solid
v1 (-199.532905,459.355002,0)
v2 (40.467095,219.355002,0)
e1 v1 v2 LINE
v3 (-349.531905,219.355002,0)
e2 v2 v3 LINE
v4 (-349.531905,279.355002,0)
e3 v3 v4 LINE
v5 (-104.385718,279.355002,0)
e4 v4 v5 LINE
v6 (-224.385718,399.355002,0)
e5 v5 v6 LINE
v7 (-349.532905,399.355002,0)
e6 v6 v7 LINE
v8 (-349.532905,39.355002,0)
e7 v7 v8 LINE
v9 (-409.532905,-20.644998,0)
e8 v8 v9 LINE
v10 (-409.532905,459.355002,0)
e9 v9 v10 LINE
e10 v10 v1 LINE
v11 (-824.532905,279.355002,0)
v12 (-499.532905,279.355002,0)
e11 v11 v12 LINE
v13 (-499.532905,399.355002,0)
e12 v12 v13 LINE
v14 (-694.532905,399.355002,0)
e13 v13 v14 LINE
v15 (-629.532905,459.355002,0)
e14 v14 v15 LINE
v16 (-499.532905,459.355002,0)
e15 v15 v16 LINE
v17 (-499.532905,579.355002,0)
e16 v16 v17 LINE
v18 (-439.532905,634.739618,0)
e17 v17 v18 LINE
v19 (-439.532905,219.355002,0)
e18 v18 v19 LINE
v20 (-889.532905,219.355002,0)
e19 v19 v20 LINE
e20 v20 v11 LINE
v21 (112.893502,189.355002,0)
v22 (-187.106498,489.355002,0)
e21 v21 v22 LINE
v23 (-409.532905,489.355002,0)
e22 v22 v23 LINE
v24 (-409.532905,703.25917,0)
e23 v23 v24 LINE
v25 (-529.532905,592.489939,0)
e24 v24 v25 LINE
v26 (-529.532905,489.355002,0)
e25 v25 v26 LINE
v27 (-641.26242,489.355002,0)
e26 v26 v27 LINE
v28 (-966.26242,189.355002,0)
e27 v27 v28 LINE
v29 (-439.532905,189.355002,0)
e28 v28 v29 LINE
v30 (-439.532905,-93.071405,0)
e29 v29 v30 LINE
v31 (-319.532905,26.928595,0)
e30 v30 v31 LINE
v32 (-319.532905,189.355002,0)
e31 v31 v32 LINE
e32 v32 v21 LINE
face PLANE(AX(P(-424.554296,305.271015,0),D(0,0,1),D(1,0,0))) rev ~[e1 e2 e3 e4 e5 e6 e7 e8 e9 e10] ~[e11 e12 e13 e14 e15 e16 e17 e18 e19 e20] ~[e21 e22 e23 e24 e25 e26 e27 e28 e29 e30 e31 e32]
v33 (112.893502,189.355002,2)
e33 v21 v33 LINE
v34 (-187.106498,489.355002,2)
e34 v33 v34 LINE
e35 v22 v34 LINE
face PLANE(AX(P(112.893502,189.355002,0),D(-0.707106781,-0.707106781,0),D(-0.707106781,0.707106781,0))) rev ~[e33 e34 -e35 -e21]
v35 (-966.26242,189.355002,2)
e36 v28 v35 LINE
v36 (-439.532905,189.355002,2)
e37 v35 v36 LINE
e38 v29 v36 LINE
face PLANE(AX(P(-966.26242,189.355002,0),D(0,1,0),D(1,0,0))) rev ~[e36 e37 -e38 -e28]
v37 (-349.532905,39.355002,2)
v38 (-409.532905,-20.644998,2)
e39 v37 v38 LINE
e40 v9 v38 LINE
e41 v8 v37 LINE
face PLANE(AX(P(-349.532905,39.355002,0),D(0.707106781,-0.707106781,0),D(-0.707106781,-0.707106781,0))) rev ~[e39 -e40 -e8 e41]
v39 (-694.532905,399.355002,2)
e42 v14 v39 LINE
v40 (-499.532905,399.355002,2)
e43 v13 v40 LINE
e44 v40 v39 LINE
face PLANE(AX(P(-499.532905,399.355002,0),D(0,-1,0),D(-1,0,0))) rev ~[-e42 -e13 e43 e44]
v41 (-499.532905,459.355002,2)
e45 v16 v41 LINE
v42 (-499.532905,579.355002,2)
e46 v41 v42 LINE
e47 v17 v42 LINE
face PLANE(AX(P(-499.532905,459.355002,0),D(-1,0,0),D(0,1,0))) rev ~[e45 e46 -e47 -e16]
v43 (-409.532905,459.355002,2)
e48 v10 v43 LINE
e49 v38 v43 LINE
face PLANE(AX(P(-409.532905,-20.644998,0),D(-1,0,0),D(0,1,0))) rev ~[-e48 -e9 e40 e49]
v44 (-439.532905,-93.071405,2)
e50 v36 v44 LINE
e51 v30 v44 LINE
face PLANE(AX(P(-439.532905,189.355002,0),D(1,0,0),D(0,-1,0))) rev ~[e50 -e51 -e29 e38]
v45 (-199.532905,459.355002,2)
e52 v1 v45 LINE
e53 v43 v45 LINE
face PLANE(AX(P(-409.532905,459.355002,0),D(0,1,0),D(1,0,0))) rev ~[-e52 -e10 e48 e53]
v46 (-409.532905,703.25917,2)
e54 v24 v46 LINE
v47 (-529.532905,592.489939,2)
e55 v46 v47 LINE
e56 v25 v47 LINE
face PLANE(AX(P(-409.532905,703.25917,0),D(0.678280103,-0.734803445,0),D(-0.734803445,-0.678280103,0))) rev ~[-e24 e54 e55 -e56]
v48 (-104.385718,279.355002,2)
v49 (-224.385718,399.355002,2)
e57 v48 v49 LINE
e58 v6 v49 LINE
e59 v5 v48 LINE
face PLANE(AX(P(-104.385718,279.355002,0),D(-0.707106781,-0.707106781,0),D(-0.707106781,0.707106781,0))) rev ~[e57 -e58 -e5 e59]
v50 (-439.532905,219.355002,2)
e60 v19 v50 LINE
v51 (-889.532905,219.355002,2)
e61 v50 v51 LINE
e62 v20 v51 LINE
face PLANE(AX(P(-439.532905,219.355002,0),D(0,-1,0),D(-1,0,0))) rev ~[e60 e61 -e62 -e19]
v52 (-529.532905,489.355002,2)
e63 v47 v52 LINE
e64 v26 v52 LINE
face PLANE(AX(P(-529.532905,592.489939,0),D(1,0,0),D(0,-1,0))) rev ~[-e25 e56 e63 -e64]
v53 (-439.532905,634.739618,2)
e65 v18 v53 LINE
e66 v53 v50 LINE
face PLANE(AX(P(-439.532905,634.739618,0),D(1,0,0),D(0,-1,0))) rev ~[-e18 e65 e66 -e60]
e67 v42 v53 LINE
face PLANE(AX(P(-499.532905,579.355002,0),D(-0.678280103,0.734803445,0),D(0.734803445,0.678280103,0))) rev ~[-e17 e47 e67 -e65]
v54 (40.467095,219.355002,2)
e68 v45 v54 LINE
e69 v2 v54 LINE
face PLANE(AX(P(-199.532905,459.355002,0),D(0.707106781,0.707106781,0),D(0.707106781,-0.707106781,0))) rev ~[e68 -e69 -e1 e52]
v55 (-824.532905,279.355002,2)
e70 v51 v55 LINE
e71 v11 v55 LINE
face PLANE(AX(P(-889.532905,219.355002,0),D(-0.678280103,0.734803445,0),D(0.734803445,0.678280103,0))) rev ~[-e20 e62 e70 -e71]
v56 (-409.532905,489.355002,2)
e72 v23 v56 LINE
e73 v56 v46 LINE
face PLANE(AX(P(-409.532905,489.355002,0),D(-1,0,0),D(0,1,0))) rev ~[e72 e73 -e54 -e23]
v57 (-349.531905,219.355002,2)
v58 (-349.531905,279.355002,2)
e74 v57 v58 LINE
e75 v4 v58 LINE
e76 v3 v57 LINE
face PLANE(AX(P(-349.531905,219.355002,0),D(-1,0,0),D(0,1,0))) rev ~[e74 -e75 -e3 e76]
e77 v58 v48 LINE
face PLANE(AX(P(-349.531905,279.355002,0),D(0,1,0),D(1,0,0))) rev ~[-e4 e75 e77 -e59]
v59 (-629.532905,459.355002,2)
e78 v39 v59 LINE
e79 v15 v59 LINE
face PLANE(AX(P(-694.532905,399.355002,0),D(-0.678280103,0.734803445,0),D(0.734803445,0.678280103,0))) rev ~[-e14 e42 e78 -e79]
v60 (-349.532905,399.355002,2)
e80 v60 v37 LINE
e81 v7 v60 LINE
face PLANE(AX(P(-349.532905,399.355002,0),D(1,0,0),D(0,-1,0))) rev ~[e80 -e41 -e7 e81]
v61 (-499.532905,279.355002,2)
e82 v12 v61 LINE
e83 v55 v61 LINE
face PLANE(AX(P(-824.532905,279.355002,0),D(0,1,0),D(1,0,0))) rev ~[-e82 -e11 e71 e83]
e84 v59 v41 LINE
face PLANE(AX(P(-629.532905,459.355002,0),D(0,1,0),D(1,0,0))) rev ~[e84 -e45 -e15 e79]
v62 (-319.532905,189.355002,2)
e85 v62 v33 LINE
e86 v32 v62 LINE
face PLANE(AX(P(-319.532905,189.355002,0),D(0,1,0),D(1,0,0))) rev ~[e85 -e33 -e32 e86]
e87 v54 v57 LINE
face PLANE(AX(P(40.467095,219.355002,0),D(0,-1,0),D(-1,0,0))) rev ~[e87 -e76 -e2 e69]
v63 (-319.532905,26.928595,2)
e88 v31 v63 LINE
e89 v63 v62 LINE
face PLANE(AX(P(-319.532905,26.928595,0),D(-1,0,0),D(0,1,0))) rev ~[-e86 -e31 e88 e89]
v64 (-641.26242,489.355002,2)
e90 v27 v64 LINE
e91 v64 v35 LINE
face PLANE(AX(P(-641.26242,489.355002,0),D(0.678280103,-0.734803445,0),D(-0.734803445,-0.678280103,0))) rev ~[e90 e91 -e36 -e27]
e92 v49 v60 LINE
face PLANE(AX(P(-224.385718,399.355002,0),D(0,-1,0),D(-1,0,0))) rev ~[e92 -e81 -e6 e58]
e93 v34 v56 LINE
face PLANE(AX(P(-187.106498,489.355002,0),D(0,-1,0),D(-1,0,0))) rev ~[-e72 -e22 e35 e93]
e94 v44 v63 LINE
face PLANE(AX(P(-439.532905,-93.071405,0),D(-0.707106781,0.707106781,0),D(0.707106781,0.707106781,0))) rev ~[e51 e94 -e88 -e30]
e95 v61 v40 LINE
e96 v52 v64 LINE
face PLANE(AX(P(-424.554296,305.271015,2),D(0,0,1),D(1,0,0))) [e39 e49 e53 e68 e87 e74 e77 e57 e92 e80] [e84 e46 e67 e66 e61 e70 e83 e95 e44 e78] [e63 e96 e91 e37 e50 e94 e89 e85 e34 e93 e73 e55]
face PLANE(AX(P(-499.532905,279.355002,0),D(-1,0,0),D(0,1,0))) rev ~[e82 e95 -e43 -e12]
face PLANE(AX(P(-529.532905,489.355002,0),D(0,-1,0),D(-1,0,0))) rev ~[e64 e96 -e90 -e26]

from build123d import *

# Parameters (mm, degrees)
F0_W     = 0.001
F0_H     = 60
F1_DEPTH = 2


with BuildPart() as f1:
    # F0 (on Top) → F1 (new body)
    with BuildSketch(Plane.XY):
        Polygon((-409.5329046249, 489.3550023332), (-409.5329046249, 703.2591700554), (-439.5329046249, 675.5668623631), (-439.5329046249, 634.7396177178), (-439.5329046249, 219.3550023332), (-439.5329046249, 189.3550023332), (-439.5329046249, -93.071404538), (-409.5329046249, -63.071404538), (-409.5329046249, -20.6449976668), (-409.5329046249, 189.3550023332), (-409.5329046249, 279.3550023332), (-409.5329046249, 399.3550023332), (-409.5329046249, 459.3550023332), align=None)
        Polygon((-187.1064977537, 489.3550023332), (-409.5329046249, 489.3550023332), (-409.5329046249, 459.3550023332), (-199.5329046249, 459.3550023332), (-157.1064977537, 459.3550023332), align=None)
        Polygon((-439.5329046249, 634.7396177178), (-439.5329046249, 675.5668623631), (-499.5329046249, 620.1822469785), (-499.5329046249, 579.3550023332), align=None)
        Polygon((-499.5329046249, 579.3550023332), (-499.5329046249, 620.1822469785), (-529.5329046249, 592.4899392862), (-529.5329046249, 551.6626946409), align=None)
        Polygon((-157.1064977537, 459.3550023332), (-199.5329046249, 459.3550023332), (-139.5329046249, 399.3550023332), (40.4670953751, 219.3550023332), (-44.3857183673, 219.3550023332), (-349.5319046249, 219.3550023332), (-349.5329046249, 219.3550023332), (-349.5329046249, 189.3550023332), (-319.5329046249, 189.3550023332), (112.8935022463, 189.3550023332), align=None)
        Polygon((-439.5329046249, 189.3550023332), (-439.5329046249, 219.3550023332), (-889.5329046249, 219.3550023332), (-922.0329046249, 189.3550023332), align=None)
        Polygon((-499.5329046249, 459.3550023332), (-499.5329046249, 579.3550023332), (-529.5329046249, 551.6626946409), (-529.5329046249, 489.3550023332), (-597.0329046249, 489.3550023332), (-629.5329046249, 459.3550023332), align=None)
        Polygon((-224.3857183673, 399.3550023332), (-349.5329046249, 399.3550023332), (-349.5329046249, 279.3550023332), (-349.5319046249, 279.3550023332), (-104.3857183673, 279.3550023332), align=None)
        Polygon((-922.0329046249, 189.3550023332), (-889.5329046249, 219.3550023332), (-933.7624196573, 219.3550023332), (-966.2624196573, 189.3550023332), align=None)
        Polygon((-933.7624196573, 219.3550023332), (-889.5329046249, 219.3550023332), (-824.5329046249, 279.3550023332), (-868.7624196573, 279.3550023332), align=None)
        Polygon((-597.0329046249, 489.3550023332), (-641.2624196573, 489.3550023332), (-673.7624196573, 459.3550023332), (-629.5329046249, 459.3550023332), align=None)
        with Locations((-349.5324046249, 249.3550023332)):
            Rectangle(F0_W, F0_H)
        Polygon((-319.5329046249, 26.928595462), (-319.5329046249, 189.3550023332), (-349.5329046249, 189.3550023332), (-349.5329046249, 39.3550023332), (-349.5329046249, -3.071404538), align=None)
        Polygon((-694.5329046249, 399.3550023332), (-824.5329046249, 279.3550023332), (-499.5329046249, 279.3550023332), (-499.5329046249, 399.3550023332), align=None)
        Polygon((-868.7624196573, 279.3550023332), (-824.5329046249, 279.3550023332), (-694.5329046249, 399.3550023332), (-738.7624196573, 399.3550023332), align=None)
        Polygon((-694.5329046249, 399.3550023332), (-629.5329046249, 459.3550023332), (-673.7624196573, 459.3550023332), (-738.7624196573, 399.3550023332), align=None)
        Polygon((-349.5329046249, 39.3550023332), (-409.5329046249, -20.6449976668), (-409.5329046249, -63.071404538), (-349.5329046249, -3.071404538), align=None)
    extrude(amount=F1_DEPTH)


solid = f1.part
